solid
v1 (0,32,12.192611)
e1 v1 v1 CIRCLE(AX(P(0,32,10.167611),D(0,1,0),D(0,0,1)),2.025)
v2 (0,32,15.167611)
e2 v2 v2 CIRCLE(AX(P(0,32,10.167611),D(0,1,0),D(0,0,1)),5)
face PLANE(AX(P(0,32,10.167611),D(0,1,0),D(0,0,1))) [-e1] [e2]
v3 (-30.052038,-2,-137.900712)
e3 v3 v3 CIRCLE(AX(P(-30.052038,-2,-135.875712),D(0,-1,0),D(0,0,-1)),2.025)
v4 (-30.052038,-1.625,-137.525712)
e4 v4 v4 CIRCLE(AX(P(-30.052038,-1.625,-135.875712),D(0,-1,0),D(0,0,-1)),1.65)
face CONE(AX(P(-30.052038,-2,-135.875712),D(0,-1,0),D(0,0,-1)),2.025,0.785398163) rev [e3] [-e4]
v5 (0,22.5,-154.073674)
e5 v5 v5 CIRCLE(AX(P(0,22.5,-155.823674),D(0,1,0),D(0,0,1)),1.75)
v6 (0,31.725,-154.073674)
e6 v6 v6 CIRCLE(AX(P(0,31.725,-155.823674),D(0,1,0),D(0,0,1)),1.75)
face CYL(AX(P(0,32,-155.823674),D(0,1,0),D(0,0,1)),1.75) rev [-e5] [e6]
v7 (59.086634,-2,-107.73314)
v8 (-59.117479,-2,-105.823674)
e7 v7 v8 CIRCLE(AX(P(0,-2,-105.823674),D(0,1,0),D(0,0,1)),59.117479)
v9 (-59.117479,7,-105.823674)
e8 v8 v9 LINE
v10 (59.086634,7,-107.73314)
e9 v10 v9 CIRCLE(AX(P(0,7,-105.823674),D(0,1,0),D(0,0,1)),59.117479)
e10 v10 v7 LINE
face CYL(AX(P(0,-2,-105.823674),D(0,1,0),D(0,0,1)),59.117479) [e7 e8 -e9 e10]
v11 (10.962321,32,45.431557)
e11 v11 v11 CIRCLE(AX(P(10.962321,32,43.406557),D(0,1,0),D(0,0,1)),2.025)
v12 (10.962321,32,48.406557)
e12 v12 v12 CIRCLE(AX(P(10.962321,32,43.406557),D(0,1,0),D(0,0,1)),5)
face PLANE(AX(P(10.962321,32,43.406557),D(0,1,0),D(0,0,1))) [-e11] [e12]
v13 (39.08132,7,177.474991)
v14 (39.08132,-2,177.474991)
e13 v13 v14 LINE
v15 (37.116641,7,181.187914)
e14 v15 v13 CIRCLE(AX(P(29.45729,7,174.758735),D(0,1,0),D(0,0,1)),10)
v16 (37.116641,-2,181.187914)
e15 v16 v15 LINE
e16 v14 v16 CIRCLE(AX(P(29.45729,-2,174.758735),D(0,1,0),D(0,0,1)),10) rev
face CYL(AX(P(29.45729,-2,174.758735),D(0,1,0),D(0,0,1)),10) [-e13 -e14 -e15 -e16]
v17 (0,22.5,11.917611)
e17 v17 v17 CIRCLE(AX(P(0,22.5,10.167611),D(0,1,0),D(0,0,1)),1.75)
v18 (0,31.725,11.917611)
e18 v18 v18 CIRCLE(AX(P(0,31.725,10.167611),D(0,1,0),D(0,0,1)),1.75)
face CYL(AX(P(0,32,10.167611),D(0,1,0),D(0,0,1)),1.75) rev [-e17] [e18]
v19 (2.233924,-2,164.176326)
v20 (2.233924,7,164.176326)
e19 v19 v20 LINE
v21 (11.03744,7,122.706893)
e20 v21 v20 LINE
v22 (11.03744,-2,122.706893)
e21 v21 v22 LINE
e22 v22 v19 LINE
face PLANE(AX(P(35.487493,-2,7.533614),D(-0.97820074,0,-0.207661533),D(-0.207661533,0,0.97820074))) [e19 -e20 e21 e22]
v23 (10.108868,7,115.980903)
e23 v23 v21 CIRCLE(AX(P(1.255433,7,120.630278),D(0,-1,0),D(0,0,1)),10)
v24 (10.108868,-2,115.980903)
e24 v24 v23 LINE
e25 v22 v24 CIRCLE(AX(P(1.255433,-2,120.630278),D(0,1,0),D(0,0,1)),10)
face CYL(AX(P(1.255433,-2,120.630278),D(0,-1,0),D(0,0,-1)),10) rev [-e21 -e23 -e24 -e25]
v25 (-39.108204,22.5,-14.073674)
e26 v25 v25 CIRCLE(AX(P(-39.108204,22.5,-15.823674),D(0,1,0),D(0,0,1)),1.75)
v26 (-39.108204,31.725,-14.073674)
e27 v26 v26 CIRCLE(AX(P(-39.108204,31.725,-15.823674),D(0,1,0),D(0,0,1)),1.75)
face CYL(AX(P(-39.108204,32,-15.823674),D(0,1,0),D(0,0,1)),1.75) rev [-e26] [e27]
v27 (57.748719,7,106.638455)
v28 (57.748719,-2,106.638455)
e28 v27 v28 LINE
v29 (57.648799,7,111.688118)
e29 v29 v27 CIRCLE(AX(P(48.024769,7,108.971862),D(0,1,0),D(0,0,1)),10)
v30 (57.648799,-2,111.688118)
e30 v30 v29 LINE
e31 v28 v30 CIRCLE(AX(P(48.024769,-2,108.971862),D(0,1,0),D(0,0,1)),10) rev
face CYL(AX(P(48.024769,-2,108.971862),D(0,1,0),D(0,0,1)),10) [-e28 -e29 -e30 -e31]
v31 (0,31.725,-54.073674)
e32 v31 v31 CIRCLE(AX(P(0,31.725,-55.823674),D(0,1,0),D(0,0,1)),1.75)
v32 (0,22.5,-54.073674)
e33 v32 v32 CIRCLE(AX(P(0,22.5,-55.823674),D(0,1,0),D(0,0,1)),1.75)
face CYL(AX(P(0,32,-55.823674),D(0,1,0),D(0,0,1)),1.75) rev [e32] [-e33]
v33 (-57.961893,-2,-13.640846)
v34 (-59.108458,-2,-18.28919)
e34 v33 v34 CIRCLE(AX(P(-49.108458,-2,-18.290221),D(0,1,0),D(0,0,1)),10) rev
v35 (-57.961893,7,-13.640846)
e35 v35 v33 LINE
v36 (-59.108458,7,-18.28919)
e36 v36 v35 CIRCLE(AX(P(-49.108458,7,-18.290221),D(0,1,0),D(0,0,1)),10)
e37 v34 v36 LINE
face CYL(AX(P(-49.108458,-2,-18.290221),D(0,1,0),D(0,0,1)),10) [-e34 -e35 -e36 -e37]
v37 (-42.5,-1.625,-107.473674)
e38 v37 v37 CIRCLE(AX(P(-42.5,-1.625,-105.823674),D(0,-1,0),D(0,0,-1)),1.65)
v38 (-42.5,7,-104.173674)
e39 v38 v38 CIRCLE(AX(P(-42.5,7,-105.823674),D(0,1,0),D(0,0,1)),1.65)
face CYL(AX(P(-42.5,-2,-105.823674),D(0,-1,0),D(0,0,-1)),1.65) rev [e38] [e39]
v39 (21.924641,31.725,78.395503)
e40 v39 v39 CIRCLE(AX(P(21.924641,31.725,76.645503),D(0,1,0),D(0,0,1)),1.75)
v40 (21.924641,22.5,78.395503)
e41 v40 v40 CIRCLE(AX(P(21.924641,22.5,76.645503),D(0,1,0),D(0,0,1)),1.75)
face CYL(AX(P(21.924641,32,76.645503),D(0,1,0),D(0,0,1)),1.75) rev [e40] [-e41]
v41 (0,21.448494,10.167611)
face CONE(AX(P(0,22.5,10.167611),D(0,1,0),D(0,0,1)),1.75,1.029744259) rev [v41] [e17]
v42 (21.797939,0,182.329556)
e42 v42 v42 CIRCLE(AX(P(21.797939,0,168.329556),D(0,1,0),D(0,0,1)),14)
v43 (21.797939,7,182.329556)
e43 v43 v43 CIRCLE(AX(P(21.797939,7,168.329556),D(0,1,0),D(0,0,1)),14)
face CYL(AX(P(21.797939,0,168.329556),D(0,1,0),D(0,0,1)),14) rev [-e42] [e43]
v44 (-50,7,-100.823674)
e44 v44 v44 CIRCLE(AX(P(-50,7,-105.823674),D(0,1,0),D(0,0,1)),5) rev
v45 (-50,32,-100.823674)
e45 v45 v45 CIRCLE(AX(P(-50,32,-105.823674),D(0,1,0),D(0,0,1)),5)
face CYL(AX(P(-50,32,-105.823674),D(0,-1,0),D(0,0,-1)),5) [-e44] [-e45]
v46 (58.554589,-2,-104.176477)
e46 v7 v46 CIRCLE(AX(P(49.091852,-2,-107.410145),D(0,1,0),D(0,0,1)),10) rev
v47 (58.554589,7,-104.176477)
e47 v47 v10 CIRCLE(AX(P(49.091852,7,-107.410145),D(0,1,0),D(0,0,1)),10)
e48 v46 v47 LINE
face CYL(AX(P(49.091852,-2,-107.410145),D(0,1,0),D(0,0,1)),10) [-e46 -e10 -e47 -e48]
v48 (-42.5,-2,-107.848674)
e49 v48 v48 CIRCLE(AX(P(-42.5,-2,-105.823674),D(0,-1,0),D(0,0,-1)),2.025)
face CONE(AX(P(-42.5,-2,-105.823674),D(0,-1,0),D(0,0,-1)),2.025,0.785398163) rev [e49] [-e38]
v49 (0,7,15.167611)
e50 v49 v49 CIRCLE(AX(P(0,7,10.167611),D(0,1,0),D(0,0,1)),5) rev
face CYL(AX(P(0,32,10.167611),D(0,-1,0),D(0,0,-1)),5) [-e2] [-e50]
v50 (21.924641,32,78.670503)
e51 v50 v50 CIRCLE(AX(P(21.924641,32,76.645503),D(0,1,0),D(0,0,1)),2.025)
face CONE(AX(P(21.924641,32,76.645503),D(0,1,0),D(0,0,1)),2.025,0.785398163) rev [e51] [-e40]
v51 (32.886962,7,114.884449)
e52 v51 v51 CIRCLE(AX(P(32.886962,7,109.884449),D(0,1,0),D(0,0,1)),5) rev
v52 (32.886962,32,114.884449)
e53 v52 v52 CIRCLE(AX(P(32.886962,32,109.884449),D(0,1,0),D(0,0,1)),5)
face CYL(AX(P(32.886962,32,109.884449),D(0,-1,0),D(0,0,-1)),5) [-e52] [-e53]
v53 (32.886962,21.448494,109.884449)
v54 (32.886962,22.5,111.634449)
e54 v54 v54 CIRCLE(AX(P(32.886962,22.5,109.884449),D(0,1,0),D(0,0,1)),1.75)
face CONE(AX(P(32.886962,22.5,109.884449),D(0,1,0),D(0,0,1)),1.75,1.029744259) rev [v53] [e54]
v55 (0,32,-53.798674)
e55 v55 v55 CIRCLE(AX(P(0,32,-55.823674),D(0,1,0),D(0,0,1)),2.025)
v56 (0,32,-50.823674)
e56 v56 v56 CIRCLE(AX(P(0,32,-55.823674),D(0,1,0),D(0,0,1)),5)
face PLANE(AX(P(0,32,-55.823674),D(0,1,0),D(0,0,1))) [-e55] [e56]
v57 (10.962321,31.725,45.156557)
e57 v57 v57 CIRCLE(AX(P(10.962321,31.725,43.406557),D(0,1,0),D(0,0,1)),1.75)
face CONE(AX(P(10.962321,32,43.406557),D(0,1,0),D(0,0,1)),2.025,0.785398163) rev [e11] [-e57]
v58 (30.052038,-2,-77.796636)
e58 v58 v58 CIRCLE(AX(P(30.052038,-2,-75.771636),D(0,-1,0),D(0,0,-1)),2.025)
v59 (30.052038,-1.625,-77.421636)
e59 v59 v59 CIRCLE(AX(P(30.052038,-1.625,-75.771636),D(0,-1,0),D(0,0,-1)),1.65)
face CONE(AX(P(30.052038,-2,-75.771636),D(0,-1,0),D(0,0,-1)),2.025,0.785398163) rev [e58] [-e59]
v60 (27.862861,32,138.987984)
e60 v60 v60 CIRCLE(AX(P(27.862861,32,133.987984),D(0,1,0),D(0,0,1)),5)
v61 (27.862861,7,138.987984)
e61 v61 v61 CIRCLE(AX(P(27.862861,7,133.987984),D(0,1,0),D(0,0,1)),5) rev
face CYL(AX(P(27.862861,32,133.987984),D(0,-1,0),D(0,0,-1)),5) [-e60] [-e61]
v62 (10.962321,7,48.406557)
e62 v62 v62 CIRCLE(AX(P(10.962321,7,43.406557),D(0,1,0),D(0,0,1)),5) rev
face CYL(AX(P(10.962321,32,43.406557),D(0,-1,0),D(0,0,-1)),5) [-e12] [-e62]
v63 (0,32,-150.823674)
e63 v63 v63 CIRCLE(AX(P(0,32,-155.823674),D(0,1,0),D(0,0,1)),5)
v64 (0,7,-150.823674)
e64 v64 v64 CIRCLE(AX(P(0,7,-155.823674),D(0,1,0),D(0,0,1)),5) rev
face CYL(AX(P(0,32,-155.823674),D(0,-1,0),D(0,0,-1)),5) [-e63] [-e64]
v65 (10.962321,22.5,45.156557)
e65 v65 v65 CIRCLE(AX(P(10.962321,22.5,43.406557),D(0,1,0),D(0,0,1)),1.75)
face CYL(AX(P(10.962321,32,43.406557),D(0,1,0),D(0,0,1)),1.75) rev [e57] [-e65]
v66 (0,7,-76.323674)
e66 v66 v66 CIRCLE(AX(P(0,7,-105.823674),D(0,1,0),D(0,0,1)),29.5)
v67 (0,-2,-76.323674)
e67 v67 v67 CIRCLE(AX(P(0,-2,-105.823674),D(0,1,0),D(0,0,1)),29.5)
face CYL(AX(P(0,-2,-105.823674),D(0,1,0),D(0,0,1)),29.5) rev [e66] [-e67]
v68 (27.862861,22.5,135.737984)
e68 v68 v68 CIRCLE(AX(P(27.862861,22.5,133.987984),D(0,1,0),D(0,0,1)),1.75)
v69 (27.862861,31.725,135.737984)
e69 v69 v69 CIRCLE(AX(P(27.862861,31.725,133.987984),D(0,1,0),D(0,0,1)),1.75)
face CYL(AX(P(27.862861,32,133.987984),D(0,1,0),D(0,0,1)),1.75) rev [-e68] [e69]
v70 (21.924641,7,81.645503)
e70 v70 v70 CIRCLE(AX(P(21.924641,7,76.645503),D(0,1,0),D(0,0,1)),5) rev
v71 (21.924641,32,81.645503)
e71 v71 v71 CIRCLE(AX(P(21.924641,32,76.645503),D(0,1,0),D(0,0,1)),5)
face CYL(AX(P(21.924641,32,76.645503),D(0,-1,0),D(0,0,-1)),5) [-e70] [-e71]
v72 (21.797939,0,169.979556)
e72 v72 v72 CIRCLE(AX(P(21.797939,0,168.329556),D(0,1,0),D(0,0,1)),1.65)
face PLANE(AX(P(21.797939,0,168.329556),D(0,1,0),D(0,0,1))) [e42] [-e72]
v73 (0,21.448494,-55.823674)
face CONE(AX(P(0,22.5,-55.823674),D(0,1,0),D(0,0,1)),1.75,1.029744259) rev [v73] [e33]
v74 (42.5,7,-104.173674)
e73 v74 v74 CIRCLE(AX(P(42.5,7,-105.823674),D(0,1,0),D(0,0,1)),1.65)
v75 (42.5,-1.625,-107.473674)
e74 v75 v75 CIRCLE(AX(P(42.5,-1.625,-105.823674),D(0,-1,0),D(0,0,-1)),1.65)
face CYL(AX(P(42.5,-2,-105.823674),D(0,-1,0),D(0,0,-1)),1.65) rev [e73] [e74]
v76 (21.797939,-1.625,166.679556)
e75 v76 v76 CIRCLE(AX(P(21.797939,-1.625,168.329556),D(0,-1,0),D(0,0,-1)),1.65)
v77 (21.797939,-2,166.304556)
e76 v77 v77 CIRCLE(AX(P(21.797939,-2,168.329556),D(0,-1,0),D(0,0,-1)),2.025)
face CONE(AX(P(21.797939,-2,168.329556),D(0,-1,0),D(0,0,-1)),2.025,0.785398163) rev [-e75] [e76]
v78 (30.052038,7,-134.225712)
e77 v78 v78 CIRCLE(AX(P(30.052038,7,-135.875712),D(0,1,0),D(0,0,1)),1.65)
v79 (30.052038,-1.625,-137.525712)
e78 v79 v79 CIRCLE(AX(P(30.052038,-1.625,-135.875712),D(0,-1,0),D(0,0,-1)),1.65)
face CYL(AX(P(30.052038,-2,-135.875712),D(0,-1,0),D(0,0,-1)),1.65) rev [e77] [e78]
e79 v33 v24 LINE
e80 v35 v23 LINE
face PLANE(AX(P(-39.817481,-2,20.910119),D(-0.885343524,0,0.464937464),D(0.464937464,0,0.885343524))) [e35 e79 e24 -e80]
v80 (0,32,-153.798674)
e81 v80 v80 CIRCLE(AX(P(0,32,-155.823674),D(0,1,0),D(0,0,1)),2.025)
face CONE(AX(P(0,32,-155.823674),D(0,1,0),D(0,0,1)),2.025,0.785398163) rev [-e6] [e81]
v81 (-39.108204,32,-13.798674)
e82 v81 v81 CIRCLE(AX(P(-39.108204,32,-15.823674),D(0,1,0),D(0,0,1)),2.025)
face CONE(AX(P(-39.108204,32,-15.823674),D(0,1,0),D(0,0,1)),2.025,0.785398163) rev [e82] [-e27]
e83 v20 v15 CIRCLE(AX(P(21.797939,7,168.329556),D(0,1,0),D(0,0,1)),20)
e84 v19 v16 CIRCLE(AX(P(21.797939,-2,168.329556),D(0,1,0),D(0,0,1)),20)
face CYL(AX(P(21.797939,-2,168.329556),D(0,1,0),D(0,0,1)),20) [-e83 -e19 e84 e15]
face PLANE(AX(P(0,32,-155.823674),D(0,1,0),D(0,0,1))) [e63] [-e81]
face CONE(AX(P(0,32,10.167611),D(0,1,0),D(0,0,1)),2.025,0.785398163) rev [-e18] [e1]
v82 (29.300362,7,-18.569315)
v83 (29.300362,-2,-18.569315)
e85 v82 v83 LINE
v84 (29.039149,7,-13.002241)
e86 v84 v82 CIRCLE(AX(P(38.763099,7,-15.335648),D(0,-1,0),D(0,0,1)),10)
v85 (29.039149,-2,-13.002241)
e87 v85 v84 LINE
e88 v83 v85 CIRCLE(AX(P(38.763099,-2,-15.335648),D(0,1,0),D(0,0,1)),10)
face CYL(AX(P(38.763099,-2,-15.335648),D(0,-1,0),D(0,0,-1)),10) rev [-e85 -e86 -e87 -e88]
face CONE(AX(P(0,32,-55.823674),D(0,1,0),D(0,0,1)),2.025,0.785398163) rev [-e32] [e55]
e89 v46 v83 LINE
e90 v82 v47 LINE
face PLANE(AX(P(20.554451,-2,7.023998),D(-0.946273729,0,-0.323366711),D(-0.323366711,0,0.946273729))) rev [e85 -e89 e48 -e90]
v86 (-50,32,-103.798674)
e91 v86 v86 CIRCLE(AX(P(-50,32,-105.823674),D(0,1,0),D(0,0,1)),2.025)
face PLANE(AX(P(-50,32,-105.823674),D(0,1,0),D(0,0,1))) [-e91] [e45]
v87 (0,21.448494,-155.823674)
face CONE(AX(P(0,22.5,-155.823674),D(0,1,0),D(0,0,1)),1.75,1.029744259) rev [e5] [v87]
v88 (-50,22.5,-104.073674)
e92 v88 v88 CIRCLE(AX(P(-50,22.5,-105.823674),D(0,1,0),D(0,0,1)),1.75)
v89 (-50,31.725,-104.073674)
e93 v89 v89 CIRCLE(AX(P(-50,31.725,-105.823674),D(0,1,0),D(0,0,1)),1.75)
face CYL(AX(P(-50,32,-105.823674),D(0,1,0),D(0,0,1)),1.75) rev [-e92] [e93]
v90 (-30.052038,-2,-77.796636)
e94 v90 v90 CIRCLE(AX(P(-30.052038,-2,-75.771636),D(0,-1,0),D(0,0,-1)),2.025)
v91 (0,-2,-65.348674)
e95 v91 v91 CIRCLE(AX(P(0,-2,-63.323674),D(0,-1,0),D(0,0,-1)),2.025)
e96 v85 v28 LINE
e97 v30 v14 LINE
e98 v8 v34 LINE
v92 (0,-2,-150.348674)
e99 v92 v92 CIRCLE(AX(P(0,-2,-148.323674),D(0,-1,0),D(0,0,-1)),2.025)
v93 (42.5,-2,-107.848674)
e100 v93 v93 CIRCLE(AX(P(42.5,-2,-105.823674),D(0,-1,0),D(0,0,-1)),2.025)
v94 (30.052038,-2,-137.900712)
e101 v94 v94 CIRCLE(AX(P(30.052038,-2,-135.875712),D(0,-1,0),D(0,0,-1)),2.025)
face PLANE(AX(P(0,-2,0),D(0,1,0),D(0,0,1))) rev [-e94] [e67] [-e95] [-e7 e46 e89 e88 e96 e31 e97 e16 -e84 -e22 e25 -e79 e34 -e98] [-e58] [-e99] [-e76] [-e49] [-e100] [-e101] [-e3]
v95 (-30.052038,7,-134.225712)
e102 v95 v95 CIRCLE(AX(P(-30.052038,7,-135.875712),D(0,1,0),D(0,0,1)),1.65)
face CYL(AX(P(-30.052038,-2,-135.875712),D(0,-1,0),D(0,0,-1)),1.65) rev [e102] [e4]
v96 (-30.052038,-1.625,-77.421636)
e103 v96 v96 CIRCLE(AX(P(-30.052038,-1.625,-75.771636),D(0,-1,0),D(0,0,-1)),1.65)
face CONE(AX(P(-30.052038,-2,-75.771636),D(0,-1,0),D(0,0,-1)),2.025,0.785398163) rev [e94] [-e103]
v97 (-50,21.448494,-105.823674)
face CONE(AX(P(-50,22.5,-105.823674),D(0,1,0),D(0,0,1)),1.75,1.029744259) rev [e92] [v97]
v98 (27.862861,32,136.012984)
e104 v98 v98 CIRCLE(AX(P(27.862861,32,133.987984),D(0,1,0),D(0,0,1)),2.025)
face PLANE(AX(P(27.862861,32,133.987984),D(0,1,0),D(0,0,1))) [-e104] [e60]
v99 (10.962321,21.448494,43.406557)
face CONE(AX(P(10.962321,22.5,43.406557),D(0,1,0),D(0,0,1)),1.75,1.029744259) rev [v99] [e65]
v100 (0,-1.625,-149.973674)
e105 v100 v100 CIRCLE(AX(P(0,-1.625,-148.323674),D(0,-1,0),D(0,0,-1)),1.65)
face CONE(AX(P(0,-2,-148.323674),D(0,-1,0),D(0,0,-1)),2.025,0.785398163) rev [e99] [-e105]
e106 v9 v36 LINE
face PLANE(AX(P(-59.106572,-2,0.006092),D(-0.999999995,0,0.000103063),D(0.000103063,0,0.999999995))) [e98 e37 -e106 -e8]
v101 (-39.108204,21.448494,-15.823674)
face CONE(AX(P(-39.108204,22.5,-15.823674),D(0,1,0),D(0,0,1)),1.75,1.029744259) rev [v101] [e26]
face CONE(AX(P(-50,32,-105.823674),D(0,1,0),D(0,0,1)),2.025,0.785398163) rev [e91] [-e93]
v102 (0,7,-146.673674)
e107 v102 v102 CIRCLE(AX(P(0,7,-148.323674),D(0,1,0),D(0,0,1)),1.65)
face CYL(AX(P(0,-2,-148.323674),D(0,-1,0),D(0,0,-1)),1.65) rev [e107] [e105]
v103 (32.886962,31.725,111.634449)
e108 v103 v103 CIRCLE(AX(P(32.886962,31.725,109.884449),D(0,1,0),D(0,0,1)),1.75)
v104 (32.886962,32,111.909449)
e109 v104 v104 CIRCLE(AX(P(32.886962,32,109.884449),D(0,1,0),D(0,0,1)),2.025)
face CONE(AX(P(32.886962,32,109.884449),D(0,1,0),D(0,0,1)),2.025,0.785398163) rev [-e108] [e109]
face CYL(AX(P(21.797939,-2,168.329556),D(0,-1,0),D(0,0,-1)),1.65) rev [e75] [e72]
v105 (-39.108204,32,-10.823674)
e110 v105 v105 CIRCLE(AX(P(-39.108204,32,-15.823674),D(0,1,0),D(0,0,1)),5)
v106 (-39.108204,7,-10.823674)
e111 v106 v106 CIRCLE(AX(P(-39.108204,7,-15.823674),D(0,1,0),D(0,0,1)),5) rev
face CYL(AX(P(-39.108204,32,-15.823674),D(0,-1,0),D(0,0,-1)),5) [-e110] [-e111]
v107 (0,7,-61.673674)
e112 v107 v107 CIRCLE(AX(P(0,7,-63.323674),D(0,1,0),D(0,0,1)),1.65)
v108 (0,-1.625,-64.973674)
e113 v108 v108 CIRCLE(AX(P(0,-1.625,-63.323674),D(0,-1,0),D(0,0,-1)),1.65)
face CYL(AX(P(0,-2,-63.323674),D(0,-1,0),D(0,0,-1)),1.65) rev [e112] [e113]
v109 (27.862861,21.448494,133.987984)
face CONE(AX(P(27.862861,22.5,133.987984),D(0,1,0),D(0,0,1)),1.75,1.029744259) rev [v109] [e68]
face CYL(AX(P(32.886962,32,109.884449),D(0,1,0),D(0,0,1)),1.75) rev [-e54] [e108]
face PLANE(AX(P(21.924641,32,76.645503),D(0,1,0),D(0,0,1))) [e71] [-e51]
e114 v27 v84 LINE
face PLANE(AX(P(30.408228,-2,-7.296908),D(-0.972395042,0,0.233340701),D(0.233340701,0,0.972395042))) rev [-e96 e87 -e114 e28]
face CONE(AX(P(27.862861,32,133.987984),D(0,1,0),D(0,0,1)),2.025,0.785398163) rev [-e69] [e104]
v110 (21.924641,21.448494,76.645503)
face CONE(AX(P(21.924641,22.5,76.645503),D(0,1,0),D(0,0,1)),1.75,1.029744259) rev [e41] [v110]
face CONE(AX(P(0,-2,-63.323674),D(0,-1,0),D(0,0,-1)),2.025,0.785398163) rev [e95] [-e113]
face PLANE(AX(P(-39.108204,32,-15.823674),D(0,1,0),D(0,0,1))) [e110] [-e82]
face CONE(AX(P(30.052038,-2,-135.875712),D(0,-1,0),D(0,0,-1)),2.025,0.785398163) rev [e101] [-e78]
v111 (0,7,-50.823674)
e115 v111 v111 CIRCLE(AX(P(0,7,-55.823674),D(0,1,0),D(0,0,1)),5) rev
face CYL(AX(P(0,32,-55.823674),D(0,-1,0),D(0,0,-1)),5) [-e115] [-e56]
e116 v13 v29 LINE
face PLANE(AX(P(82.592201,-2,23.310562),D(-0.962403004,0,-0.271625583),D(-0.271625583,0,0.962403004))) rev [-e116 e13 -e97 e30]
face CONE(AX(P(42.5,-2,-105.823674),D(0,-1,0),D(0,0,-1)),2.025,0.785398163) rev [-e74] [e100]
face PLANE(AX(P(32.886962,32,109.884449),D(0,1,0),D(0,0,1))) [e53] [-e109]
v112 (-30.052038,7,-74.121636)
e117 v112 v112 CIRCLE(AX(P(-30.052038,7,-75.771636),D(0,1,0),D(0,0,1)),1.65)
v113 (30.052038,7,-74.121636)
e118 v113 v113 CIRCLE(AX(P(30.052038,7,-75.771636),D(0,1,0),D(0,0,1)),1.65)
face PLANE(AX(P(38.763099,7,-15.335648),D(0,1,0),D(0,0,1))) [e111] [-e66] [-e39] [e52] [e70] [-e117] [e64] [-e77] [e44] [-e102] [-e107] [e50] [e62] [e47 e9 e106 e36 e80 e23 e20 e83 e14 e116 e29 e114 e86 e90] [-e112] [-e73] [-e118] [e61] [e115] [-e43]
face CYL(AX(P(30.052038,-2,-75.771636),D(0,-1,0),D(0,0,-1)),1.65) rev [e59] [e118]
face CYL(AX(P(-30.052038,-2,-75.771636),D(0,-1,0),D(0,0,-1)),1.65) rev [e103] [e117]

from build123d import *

# Parameters (mm, degrees)
EXTRUDE_1_DEPTH              = 5
EXTRUDE_1_DEPTH_BACK         = 2
FILLET_1_R                   = 10
EXTRUDE_2_DEPTH              = 2
SKETCH_7_R                   = 5
EXTRUDE_4_DEPTH              = 27
SKETCH_9_R                   = 29.5
CUT_EXTRUDE_2_DEPTH          = 199.967077983
SKETCH_6_R                   = 5
EXTRUDE_6_DEPTH              = 27
M4X0_5_1_D                   = 3.5
M4X0_5_1_DEPTH               = 9.5
M4X0_5_1_CSINK_D             = 4.05
M4X0_5_1_CSINK_ANGLE         = 90
M4X0_5_1_TIP                 = 1.051506083
SKETCH_12_R                  = 14
CUT_EXTRUDE_3_DEPTH          = 7
HOLE_WIZARD_M4_1_D           = 3.3
HOLE_WIZARD_M4_1_DEPTH       = 10.1
HOLE_WIZARD_M4_1_CSINK_D     = 4.05
HOLE_WIZARD_M4_1_CSINK_ANGLE = 90
HOLE_WIZARD_M4_1_TIP         = 0.991420021
PATTERN_CIRCULAR_1_COUNT     = 8


# Read off the part's stored shape, not the designer's step: M4 螺纹孔2
with BuildPart() as part:
    # 草图1 → 凸台-拉伸1 (new, two sides: drawn at the far end of the back side and taken through both)
    with BuildSketch(Plane(origin=(0, 0, 0), x_dir=(1, 0, 0), z_dir=(0, 1, 0)).offset(-EXTRUDE_1_DEPTH_BACK)):
        with BuildLine():
            Line((28.36210367, 15.823673932), (59.117479337, 105.823673932))
            ThreePointArc((59.117479337, 105.823673932), (0, 164.941153269), (-59.117479337, 105.823673932))
            Line((-59.117479337, 105.823673932), (-59.117478081, 105.811488283))
            Line((-59.117478081, 105.811488283), (-59.108203667, 15.82367441))
            Line((-59.108203667, 15.82367441), (11.786941507, -119.17632559))
            Line((11.786941507, -119.17632559), (2.233923801, -164.17632559))
            ThreePointArc((2.233923801, -164.17632559), (14.171961552, -186.818592843), (38.601140216, -179.176326068))
            Line((38.601140216, -179.176326068), (58.357719046, -109.176326068))
            Line((58.357719046, -109.176326068), (28.36210367, 15.823673932))
        make_face()
    extrude(amount=EXTRUDE_1_DEPTH + EXTRUDE_1_DEPTH_BACK)

    # 圆角1
    fillet_1_edges = [part.edges().sort_by_distance(p)[0] for p in [
        (11.786941507, 1.5, 119.17632559),
        (-59.108203667, 1.5, -15.82367441),
        (59.117479337, 1.5, -105.823673932),
        (28.36210367, 1.5, -15.823673932),
        (58.357719046, 1.5, 109.176326068),
        (38.601140216, 1.5, 179.176326068),
    ]]
    fillet(fillet_1_edges, radius=FILLET_1_R)

    # 草图8 → 凸台-拉伸2 (add)
    with BuildSketch(Plane(origin=(0, 5, 0), x_dir=(1, 0, 0), z_dir=(0, 1, 0))):
        with BuildLine():
            Line((29.300361737, 18.569315114), (58.554588826, 104.176477469))
            ThreePointArc((58.554588826, 104.176477469), (58.98180751, 105.930695077), (59.086633883, 107.733139709))
            ThreePointArc((59.086633883, 107.733139709), (-0.95485745, 164.933441402), (-59.117479337, 105.823673932))
            Line((-59.117479337, 105.823673932), (-59.108457771, 18.289190078))
            ThreePointArc((-59.108457771, 18.289190078), (-58.817462925, 15.895388783), (-57.961893059, 13.640846069))
            Line((-57.961893059, 13.640846069), (10.108867752, -115.980902881))
            ThreePointArc((10.108867752, -115.980902881), (11.161474402, -119.262675904), (11.037439917, -122.706892851))
            Line((11.037439917, -122.706892851), (2.233923801, -164.17632559))
            ThreePointArc((2.233923801, -164.17632559), (13.031285464, -186.305812614), (37.116640576, -181.187914225))
            ThreePointArc((37.116640576, -181.187914225), (38.296139318, -179.43577869), (39.081319631, -177.47499107))
            Line((39.081319631, -177.47499107), (57.648798745, -111.688118295))
            ThreePointArc((57.648798745, -111.688118295), (58.022811544, -109.169699075), (57.748719119, -106.63845545))
            Line((57.748719119, -106.63845545), (29.039148609, 13.002240988))
            ThreePointArc((29.039148609, 13.002240988), (28.774088822, 15.804343144), (29.300361737, 18.569315114))
        make_face()
    extrude(amount=EXTRUDE_2_DEPTH)

    # 草图7 → 凸台-拉伸4 (add)
    with BuildSketch(Plane(origin=(0, 5, 0), x_dir=(1, 0, 0), z_dir=(0, 1, 0))):
        with Locations(Location((0, -10.167611435, 0), (0, 0, 270))):
            Circle(SKETCH_7_R)
        with Locations(Location((10.962320581, -43.406557379, 0), (0, 0, 270))):
            Circle(SKETCH_7_R)
        with Locations(Location((21.924641163, -76.645503323, 0), (0, 0, 270))):
            Circle(SKETCH_7_R)
        with Locations(Location((32.886961744, -109.884449267, 0), (0, 0, 270))):
            Circle(SKETCH_7_R)
        with Locations(Location((27.862861404, -133.987984293, 0), (0, 0, 270))):
            Circle(SKETCH_7_R)
    extrude(amount=EXTRUDE_4_DEPTH)

    # 草图9 → 切除-拉伸2 (cut, through all)
    with BuildSketch(Plane(origin=(0, 7, 0), x_dir=(1, 0, 0), z_dir=(0, 1, 0))):
        with Locations(Location((0, 105.823673932, 0), (0, 0, 270))):
            Circle(SKETCH_9_R)
    extrude(amount=-CUT_EXTRUDE_2_DEPTH, mode=Mode.SUBTRACT)

    # 草图6 → 凸台-拉伸6 (add)
    with BuildSketch(Plane(origin=(0, 5, 0), x_dir=(1, 0, 0), z_dir=(0, 1, 0))):
        with Locations(Location((0, 155.823673932, 0), (0, 0, 270))):
            Circle(SKETCH_6_R)
        with Locations(Location((0, 55.823673932, 0), (0, 0, 270))):
            Circle(SKETCH_6_R)
        with Locations(Location((-50, 105.823673932, 0), (0, 0, 270))):
            Circle(SKETCH_6_R)
        with Locations(Location((-39.108203667, 15.82367441, 0), (0, 0, 270))):
            Circle(SKETCH_6_R)
    extrude(amount=EXTRUDE_6_DEPTH)

    # M4x0.5 螺纹孔1
    with Locations(Plane(origin=(0, 32, 0), x_dir=(1, 0, 0), z_dir=(0, 1, 0))):
        with Locations((0, 155.823673932), (-50, 105.823673932), (0, 55.823673932), (-39.108203667, 15.82367441), (0, -10.167611435), (10.962320581, -43.406557379), (21.924641163, -76.645503323), (32.886961744, -109.884449267), (27.862861404, -133.987984293)):
            CounterSinkHole(M4X0_5_1_D / 2, M4X0_5_1_CSINK_D / 2, depth=M4X0_5_1_DEPTH, counter_sink_angle=M4X0_5_1_CSINK_ANGLE)
            with Locations((0, 0, -(M4X0_5_1_DEPTH + M4X0_5_1_TIP / 2))):  # 118° drill point
                Cone(0, M4X0_5_1_D / 2, M4X0_5_1_TIP, mode=Mode.SUBTRACT)

    # 草图12 → 切除-拉伸3 (cut)
    with BuildSketch(Plane(origin=(0, 7, 0), x_dir=(1, 0, 0), z_dir=(0, 1, 0))):
        with Locations(Location((21.7979386, -168.329556252, 0), (0, 0, 270))):
            Circle(SKETCH_12_R)
    extrude(amount=-CUT_EXTRUDE_3_DEPTH, mode=Mode.SUBTRACT)

    # M4 螺纹孔1
    with Locations(Plane(origin=(0, -2, 0), x_dir=(-1, 0, 0), z_dir=(0, -1, 0))):
        with Locations((-21.7979386, -168.329556252)):
            CounterSinkHole(HOLE_WIZARD_M4_1_D / 2, HOLE_WIZARD_M4_1_CSINK_D / 2, depth=HOLE_WIZARD_M4_1_DEPTH, counter_sink_angle=HOLE_WIZARD_M4_1_CSINK_ANGLE)
            with Locations((0, 0, -(HOLE_WIZARD_M4_1_DEPTH + HOLE_WIZARD_M4_1_TIP / 2))):  # 118° drill point
                Cone(0, HOLE_WIZARD_M4_1_D / 2, HOLE_WIZARD_M4_1_TIP, mode=Mode.SUBTRACT)

    # M4 螺纹孔2 outline → M4 螺纹孔2 (revolve, cut)
    with BuildSketch(Plane.XY.offset(-148.323673932)):
        Polygon((1.65, -1.625), (1.65, 7), (0, 7), (0, -2), (2.025, -2), align=None)
    hole_wizard_m4_2 = revolve(axis=Axis((0, 0, -148.323673932), (0, 1, 0)), mode=Mode.SUBTRACT)

    # 阵列(圆周)1: M4 螺纹孔2 ×8 about axis
    pattern_circular_1_axis = Axis((0, 0, -105.823673932), (0, 1, 0))
    for i in range(1, PATTERN_CIRCULAR_1_COUNT):
        add(hole_wizard_m4_2.rotate(pattern_circular_1_axis, i * 360 / PATTERN_CIRCULAR_1_COUNT), mode=Mode.SUBTRACT)


solid = part.part
